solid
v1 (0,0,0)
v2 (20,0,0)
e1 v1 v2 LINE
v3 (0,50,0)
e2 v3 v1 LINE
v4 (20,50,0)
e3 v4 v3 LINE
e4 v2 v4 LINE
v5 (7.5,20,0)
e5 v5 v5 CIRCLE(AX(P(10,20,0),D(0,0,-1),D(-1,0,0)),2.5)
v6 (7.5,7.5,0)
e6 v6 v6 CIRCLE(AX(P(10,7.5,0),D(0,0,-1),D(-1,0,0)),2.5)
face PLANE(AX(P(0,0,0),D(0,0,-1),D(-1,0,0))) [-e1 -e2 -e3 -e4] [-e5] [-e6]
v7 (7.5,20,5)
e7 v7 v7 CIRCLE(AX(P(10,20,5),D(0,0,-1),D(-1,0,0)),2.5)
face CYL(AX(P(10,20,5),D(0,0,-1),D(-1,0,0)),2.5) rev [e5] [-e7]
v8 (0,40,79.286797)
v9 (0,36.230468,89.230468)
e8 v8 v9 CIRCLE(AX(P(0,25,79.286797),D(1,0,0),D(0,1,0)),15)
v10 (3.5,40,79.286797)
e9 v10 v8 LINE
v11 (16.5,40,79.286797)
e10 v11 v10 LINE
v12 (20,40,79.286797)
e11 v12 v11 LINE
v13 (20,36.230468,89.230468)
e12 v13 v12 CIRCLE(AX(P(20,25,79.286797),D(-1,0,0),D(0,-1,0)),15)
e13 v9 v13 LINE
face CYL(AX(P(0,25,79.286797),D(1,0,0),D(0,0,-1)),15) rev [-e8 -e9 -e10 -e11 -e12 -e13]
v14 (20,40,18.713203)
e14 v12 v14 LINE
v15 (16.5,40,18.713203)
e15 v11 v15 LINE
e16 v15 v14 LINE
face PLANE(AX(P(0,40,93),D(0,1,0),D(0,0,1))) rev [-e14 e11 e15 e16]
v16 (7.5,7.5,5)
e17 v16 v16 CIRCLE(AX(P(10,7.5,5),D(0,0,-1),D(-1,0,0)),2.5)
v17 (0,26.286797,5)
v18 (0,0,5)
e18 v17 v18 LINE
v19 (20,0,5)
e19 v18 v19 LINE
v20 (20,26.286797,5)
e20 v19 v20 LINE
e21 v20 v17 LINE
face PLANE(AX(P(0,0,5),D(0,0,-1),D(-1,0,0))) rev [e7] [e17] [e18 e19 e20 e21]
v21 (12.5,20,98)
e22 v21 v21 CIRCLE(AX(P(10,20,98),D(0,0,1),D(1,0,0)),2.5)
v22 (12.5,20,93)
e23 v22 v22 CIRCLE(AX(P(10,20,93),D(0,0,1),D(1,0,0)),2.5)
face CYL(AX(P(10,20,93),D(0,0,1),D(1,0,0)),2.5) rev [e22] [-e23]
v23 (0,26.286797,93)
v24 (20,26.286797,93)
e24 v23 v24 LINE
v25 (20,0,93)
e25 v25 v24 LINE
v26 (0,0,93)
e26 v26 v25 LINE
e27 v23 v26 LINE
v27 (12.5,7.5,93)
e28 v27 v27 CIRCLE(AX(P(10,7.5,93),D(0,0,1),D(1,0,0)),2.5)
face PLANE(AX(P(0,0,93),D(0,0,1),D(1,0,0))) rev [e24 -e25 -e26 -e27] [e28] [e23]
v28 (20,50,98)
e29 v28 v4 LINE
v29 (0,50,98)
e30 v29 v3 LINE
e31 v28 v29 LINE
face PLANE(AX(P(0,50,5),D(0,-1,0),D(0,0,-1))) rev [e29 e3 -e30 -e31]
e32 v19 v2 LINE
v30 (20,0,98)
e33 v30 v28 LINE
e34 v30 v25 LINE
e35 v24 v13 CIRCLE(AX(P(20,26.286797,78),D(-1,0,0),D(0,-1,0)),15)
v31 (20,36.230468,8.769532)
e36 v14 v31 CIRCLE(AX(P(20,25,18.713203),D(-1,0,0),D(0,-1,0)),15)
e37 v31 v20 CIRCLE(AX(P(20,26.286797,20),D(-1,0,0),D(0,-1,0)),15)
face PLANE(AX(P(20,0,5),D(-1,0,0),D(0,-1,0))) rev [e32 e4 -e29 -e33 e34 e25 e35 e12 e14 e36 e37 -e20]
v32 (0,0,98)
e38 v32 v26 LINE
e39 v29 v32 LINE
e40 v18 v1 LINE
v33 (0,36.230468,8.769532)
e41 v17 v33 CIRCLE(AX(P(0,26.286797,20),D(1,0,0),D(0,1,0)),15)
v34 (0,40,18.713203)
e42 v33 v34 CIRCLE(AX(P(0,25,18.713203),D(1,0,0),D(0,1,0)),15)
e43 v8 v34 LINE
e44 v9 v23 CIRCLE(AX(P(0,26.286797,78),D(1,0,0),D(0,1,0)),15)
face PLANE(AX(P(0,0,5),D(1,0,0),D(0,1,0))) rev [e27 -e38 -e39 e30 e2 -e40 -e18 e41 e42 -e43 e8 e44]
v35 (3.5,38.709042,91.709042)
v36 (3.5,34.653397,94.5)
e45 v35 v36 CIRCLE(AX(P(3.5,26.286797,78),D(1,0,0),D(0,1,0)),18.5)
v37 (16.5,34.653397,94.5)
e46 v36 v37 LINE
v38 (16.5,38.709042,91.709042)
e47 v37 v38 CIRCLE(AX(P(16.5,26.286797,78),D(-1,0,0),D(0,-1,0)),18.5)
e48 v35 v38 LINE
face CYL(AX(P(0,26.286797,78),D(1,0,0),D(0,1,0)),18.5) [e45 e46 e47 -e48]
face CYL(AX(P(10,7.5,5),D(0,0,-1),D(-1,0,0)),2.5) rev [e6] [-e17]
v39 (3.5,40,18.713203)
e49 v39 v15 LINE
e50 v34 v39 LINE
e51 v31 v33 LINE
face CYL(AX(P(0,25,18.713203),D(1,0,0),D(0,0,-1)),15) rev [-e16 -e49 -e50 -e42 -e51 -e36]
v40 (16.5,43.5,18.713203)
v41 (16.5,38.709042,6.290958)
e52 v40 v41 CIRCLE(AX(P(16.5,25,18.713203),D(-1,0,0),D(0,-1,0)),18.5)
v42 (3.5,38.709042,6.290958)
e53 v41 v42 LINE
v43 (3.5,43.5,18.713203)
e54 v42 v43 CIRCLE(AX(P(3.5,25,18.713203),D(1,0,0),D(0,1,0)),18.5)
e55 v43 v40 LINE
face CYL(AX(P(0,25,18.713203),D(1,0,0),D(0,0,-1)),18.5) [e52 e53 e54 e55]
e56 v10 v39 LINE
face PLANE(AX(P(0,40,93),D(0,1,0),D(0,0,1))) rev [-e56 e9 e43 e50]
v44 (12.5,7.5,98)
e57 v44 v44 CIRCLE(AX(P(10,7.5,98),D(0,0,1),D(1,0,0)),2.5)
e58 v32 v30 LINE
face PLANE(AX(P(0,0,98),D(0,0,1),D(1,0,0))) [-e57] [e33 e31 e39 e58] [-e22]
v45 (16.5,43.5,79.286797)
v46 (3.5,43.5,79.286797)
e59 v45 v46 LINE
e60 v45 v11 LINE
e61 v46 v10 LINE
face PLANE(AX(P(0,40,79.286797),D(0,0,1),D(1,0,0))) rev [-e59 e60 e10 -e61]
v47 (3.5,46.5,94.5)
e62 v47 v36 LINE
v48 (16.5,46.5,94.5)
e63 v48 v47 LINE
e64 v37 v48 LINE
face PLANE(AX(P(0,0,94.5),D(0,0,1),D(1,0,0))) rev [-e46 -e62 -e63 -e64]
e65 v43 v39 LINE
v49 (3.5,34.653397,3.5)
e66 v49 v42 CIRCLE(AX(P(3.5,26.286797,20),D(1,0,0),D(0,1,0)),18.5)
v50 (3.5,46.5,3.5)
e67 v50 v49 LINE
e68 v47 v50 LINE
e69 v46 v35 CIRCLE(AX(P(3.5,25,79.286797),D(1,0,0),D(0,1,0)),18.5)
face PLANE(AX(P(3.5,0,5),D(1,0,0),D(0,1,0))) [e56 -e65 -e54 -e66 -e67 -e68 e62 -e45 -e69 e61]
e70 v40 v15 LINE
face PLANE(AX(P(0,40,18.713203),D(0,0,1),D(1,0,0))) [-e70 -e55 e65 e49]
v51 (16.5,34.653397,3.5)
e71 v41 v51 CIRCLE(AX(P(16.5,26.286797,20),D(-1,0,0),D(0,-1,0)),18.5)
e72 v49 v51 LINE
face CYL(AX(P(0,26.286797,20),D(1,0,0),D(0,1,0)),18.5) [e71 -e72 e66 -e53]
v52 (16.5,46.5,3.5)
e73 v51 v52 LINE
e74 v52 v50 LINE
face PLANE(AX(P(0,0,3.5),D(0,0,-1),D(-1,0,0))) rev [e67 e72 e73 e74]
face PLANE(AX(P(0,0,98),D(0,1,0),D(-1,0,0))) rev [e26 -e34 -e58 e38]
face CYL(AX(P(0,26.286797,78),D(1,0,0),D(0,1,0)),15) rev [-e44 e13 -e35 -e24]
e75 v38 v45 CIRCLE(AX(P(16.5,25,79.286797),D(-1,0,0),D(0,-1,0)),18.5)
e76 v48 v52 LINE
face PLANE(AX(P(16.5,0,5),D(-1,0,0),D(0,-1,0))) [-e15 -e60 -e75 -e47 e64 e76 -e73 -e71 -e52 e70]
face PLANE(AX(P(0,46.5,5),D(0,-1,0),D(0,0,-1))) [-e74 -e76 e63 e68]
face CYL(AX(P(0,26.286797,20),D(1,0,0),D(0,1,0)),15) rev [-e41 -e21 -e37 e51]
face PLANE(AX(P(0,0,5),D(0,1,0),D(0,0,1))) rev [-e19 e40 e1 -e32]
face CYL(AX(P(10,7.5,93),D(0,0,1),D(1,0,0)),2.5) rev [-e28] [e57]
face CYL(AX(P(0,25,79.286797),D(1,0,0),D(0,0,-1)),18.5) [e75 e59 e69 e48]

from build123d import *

# Parameters (mm, degrees)
SKETCH1_W           = 20
SKETCH1_H           = 50
BOSS_EXTRUDE1_DEPTH = 5
SKETCH3_R           = 2.5
CUT_EXTRUDE5_DEPTH  = 5
SKETCH4_W           = 20
SKETCH4_H           = 10
BOSS_EXTRUDE2_DEPTH = 88
SKETCH5_W           = 20
SKETCH5_H           = 50
BOSS_EXTRUDE3_DEPTH = 5
CUT_EXTRUDE6_START  = -5
SKETCH6_R           = 2.5
CUT_EXTRUDE6_DEPTH  = 5
BOSS_EXTRUDE4_DEPTH = 20
FILLET1_R           = 15
SHELL2_START        = 3.5
SHELL2_DEPTH        = 13


# Read off the part's stored shape, not the designer's step: Shell2
with BuildPart() as part:
    # Sketch1 → Boss-Extrude1 (new body)
    with BuildSketch(Plane.XY):
        with Locations((10, 25)):
            Rectangle(SKETCH1_W, SKETCH1_H)
    extrude(amount=BOSS_EXTRUDE1_DEPTH)

    # Sketch3 → Cut-Extrude5 (cut)
    with BuildSketch(Plane(origin=(0, 0, 0), x_dir=(-1, 0, 0), z_dir=(0, 0, -1))):
        with Locations((-10, 7.5)):
            Circle(SKETCH3_R)
        with Locations((-10, 20)):
            Circle(SKETCH3_R)
    extrude(amount=-CUT_EXTRUDE5_DEPTH, mode=Mode.SUBTRACT)

    # Sketch4 → Boss-Extrude2 (add)
    with BuildSketch(Plane.XY.offset(5)):
        with Locations((10, 45)):
            Rectangle(SKETCH4_W, SKETCH4_H)
    extrude(amount=BOSS_EXTRUDE2_DEPTH)

    # Sketch5 → Boss-Extrude3 (add)
    with BuildSketch(Plane.XY.offset(93)):
        with Locations((10, 25)):
            Rectangle(SKETCH5_W, SKETCH5_H)
    extrude(amount=BOSS_EXTRUDE3_DEPTH)

    # Sketch6 → Cut-Extrude6 (cut)
    with BuildSketch(Plane.XY.offset(98).offset(CUT_EXTRUDE6_START)):
        with Locations(Location((10, 7.5, 0), (0, 0, 180))):
            Circle(SKETCH6_R)
        with Locations(Location((10, 20, 0), (0, 0, 180))):
            Circle(SKETCH6_R)
    extrude(amount=CUT_EXTRUDE6_DEPTH, mode=Mode.SUBTRACT)

    # Sketch7 → Boss-Extrude4 (add)
    with BuildSketch(Plane(origin=(20, 0, 0), x_dir=(0, 0, -1), z_dir=(1, 0, 0))):
        Polygon((-93, 40), (-85.5, 40), (-93, 32.5), align=None)
        Polygon((-12.5, 40), (-5, 40), (-5, 32.5), align=None)
    extrude(amount=-BOSS_EXTRUDE4_DEPTH)

    # Fillet1
    # the kernel refuses this fillet: 15 mm, written as the material it adds along each edge
    with BuildSketch(Plane(origin=(20, 32.5, 5), x_dir=(0, -1, 0), z_dir=(-1, 0, 0)), Plane(origin=(20, 40, 85.5), x_dir=(0, 0, -1), z_dir=(-1, 0, 0))) as fillet1_piece_1:
        with BuildLine():
            CenterArc((FILLET1_R * 0.414213562373, FILLET1_R), FILLET1_R, 225, 45)
            Line((-FILLET1_R * 0.292893218813, FILLET1_R * 0.292893218813), (0, 0))
            Line((0, 0), (FILLET1_R * 0.414213562373, 0))
        make_face()
    extrude(amount=20)
    with BuildSketch(Plane(origin=(20, 40, 12.5), x_dir=(0, 0, 1), z_dir=(-1, 0, 0)), Plane(origin=(20, 32.5, 93), x_dir=(0, -1, 0), z_dir=(-1, 0, 0))) as fillet1_piece_2:
        with BuildLine():
            CenterArc((FILLET1_R * 0.414213562373, -FILLET1_R), FILLET1_R, 90, 45)
            Line((-FILLET1_R * 0.292893218813, -FILLET1_R * 0.292893218813), (0, 0))
            Line((0, 0), (FILLET1_R * 0.414213562373, 0))
        make_face()
    extrude(amount=20)

    # Shell2 outline → Shell2 (cut)
    with BuildSketch(Plane.YZ.offset(SHELL2_START)):
        with BuildLine():
            ThreePointArc((38.709041728, 91.709041728), (42.260754212, 85.943850268), (43.5, 79.286796564))
            Line((43.5, 79.286796564), (40, 79.286796564))
            Line((40, 79.286796564), (40, 18.713203436))
            Line((40, 18.713203436), (43.5, 18.713203436))
            ThreePointArc((43.5, 18.713203436), (42.260754212, 12.056149732), (38.709041728, 6.290958272))
            ThreePointArc((38.709041728, 6.290958272), (36.774474362, 4.759966719), (34.65339683, 3.5))
            Line((34.65339683, 3.5), (46.5, 3.5))
            Line((46.5, 3.5), (46.5, 94.5))
            Line((46.5, 94.5), (34.65339683, 94.5))
            ThreePointArc((34.65339683, 94.5), (36.774474362, 93.240033281), (38.709041728, 91.709041728))
        make_face()
    extrude(amount=SHELL2_DEPTH, mode=Mode.SUBTRACT)


solid = part.part
